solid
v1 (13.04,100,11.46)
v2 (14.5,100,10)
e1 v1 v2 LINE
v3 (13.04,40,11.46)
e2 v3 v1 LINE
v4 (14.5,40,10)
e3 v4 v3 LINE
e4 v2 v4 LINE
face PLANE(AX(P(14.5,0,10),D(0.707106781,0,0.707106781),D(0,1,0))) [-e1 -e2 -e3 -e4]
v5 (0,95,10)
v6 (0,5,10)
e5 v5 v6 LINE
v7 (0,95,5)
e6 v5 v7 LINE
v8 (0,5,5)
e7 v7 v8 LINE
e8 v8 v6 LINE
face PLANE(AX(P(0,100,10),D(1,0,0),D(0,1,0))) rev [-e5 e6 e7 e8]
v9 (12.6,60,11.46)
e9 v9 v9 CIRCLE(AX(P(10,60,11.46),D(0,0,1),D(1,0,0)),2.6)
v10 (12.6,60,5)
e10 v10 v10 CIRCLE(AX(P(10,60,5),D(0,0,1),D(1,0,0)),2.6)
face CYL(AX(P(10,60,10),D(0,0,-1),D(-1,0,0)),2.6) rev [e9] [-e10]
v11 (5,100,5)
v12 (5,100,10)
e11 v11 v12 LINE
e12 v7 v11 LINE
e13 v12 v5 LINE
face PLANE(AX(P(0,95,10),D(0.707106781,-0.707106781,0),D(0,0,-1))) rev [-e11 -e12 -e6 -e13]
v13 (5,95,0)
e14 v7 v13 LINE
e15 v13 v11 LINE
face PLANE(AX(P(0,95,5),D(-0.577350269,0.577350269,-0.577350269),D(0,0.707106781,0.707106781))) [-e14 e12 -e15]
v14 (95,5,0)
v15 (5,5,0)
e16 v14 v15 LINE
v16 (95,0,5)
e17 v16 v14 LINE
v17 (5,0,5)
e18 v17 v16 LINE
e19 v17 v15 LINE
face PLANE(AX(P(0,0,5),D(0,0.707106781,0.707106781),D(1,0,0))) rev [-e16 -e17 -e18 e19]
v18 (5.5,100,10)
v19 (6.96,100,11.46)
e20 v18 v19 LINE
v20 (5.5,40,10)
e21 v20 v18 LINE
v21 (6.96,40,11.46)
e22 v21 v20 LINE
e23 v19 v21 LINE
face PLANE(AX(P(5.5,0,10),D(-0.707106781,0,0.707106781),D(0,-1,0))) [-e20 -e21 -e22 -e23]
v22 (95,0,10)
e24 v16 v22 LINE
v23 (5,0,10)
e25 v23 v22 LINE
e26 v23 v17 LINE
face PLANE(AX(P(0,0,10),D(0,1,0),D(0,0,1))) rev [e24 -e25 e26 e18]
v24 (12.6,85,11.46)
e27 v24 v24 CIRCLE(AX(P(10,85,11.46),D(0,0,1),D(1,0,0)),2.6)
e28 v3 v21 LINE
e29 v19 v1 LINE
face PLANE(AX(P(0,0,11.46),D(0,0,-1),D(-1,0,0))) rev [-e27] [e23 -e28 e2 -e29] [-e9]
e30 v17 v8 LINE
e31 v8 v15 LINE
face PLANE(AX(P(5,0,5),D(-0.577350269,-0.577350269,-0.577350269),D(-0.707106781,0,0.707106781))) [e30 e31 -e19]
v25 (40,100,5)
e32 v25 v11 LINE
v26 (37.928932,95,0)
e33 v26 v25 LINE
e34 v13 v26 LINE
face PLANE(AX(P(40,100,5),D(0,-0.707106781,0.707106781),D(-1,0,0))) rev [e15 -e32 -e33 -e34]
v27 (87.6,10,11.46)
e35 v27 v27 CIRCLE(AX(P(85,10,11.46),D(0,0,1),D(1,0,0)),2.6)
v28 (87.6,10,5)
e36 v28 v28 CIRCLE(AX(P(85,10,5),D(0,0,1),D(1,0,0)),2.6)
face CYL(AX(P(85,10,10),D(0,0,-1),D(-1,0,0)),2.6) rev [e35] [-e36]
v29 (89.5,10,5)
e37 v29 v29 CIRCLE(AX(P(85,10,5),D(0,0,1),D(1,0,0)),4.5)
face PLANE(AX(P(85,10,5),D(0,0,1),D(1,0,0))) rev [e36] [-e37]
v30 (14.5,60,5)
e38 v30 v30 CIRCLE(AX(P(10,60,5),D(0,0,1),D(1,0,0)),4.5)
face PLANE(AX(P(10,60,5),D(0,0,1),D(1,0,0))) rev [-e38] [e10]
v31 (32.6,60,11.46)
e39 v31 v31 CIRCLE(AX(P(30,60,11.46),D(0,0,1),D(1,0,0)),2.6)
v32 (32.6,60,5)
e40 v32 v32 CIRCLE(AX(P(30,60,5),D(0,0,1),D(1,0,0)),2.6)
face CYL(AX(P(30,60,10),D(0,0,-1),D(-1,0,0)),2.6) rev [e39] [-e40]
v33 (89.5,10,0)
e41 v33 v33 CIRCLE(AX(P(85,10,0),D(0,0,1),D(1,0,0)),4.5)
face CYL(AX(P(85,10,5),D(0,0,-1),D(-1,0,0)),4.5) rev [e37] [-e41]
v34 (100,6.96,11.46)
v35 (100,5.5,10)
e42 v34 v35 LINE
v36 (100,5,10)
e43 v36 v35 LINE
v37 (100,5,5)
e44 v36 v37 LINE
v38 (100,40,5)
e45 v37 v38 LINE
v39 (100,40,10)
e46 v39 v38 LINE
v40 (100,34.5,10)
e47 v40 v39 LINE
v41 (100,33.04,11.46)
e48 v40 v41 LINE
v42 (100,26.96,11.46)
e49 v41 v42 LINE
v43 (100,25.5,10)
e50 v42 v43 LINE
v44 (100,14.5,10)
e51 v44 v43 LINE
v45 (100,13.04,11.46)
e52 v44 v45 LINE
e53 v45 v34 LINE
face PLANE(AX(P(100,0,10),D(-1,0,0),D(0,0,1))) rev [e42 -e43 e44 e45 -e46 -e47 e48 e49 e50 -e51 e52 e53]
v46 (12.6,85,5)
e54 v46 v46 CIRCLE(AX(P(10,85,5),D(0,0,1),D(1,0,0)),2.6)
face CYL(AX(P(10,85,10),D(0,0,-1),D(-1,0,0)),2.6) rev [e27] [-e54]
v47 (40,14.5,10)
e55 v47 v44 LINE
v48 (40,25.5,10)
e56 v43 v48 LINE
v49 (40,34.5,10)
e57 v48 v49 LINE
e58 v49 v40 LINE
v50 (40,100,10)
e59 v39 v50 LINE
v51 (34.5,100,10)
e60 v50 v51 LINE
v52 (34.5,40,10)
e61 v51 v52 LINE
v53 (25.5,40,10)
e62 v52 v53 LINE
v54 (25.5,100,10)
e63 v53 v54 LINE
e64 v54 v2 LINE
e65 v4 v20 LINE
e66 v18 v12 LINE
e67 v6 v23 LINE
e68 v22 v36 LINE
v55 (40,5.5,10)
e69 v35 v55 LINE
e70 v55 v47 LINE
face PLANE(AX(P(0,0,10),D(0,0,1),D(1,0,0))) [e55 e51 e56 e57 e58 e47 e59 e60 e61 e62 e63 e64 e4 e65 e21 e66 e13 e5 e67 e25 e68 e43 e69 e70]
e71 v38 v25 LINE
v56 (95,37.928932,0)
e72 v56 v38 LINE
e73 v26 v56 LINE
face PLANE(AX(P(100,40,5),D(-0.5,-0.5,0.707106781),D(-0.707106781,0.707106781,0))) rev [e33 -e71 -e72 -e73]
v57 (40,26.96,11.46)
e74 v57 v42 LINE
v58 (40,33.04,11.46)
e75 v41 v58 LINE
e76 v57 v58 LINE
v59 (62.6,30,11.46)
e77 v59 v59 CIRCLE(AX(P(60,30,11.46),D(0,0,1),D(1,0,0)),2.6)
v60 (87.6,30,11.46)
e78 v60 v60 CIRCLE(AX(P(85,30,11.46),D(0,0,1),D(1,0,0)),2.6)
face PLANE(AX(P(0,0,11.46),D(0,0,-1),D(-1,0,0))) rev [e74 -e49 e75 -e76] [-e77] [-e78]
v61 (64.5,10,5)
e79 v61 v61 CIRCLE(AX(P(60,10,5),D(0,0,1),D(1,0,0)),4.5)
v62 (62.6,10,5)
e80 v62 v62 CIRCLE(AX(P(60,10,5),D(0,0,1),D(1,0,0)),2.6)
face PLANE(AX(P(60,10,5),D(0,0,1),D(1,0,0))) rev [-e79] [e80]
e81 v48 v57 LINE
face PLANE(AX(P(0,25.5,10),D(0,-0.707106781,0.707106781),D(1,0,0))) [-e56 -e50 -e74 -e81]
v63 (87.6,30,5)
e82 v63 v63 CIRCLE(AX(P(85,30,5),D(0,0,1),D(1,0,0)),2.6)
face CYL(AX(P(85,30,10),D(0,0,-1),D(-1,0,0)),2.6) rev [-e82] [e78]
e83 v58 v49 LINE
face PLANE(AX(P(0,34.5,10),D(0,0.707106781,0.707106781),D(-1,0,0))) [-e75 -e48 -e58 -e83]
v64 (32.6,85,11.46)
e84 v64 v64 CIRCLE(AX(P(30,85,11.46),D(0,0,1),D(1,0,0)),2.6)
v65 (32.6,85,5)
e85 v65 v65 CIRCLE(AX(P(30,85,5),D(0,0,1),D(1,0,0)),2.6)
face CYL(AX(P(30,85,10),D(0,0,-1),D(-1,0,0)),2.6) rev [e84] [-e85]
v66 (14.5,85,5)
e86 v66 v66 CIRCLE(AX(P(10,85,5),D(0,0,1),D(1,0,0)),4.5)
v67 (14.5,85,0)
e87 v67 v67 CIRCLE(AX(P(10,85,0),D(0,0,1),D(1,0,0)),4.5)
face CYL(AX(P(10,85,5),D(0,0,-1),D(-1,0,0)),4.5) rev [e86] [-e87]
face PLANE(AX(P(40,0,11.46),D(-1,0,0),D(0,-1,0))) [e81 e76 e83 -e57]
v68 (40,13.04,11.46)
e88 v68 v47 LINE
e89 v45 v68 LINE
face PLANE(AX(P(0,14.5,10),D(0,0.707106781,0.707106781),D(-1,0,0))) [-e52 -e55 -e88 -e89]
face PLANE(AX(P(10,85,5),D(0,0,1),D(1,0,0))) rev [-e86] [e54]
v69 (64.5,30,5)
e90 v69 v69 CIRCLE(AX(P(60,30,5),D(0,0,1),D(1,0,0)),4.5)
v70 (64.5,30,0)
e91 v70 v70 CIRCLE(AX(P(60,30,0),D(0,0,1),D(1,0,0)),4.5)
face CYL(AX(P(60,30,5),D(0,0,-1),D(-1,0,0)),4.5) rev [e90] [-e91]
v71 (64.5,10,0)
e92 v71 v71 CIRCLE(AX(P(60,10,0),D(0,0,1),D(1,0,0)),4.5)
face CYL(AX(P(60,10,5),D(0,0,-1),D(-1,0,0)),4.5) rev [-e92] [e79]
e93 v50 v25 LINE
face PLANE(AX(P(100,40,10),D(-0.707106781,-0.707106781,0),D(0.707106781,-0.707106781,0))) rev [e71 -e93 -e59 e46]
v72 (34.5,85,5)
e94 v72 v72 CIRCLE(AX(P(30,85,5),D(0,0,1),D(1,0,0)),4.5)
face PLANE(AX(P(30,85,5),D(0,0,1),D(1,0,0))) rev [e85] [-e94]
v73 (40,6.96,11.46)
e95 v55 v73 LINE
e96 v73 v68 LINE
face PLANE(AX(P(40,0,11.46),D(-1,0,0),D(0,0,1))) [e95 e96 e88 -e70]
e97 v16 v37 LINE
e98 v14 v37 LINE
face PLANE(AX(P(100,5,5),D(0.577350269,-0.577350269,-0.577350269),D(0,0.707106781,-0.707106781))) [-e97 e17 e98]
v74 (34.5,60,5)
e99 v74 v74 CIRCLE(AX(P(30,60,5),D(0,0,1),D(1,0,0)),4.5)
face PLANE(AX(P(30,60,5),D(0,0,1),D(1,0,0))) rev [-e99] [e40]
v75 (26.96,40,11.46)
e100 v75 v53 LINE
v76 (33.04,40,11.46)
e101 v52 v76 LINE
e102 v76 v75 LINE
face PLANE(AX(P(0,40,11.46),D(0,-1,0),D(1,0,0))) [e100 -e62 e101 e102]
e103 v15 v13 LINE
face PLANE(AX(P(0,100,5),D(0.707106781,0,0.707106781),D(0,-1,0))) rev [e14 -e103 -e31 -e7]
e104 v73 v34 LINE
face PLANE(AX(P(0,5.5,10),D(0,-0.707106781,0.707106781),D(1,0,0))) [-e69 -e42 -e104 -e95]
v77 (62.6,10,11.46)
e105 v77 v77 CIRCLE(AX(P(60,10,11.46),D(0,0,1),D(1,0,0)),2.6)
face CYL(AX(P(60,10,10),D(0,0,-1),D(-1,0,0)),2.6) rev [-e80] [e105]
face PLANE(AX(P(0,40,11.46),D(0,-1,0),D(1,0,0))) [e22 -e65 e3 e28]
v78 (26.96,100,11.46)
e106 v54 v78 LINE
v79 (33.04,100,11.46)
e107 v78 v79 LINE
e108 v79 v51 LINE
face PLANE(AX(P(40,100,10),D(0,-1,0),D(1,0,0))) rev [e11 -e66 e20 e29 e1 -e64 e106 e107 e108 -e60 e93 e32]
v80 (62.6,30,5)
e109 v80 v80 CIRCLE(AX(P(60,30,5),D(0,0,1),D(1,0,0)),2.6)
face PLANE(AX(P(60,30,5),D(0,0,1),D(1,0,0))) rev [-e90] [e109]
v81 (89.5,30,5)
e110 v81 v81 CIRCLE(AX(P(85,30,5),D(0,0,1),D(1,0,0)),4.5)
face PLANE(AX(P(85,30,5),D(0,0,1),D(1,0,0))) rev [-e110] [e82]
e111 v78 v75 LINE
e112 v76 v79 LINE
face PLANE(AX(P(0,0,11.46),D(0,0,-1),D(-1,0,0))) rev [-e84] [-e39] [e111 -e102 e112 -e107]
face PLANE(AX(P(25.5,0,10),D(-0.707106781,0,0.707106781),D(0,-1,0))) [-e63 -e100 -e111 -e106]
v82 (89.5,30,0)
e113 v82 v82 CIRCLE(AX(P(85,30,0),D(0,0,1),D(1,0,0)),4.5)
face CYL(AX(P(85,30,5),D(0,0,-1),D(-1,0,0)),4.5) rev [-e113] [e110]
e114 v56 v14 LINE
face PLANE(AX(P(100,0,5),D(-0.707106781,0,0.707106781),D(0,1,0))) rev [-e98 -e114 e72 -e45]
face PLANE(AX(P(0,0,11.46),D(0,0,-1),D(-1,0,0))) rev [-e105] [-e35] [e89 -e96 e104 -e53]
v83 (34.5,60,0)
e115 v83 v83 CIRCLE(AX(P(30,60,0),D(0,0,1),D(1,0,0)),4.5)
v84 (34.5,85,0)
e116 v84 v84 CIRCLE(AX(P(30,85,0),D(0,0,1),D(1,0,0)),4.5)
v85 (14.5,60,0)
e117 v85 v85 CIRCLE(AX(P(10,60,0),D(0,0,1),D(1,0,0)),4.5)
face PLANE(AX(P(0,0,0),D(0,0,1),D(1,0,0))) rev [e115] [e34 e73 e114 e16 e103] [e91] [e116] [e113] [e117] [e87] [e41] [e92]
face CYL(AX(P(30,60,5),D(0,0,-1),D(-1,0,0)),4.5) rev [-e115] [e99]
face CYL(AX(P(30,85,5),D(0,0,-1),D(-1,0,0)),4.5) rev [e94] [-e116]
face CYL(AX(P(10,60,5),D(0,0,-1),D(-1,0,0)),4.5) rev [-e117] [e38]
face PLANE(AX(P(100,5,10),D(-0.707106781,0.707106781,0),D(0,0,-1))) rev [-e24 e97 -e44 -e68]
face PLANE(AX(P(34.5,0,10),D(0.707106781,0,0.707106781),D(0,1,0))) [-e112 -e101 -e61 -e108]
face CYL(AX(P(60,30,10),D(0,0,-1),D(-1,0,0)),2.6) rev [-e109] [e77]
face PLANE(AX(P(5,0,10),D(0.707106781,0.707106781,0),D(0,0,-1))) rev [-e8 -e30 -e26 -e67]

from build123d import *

# Parameters (mm, degrees)
BOSS_EXTRUDE1_DEPTH     = 10
SKETCH2_R               = 2.6
CUT_EXTRUDE1_DEPTH      = 142.774468788
BOSS_EXTRUDE3_START     = 10
SKETCH3_W               = 60
SKETCH3_H               = 9
SKETCH3_W_2             = 9
SKETCH3_H_2             = 60
BOSS_EXTRUDE3_DEPTH     = 1.46
CUT_EXTRUDE2_DEPTH      = 142.884923794
CUT_EXTRUDE2_DEPTH_BACK = 142.884923794
SKETCH2_2_R             = 2.6
CHAMFER1_SIZE           = 1.46
SKETCH4_R               = 4.5
CUT_EXTRUDE3_DEPTH      = 5
CHAMFER2_SIZE           = 5


with BuildPart() as part:
    # Sketch1 → Boss-Extrude1 (new body)
    with BuildSketch(Plane.XY):
        Polygon((0, 0), (100, 0), (100, 40), (40, 100), (0, 100), align=None)
    extrude(amount=BOSS_EXTRUDE1_DEPTH)

    # Sketch2 → Cut-Extrude1 (cut, through all)
    with BuildSketch(Plane.XY):
        with Locations((10, 85)):
            Circle(SKETCH2_R)
        with Locations((30, 85)):
            Circle(SKETCH2_R)
        with Locations((10, 60)):
            Circle(SKETCH2_R)
        with Locations((30, 60)):
            Circle(SKETCH2_R)
        with Locations((85, 30)):
            Circle(SKETCH2_R)
        with Locations((85, 10)):
            Circle(SKETCH2_R)
        with Locations((60, 10)):
            Circle(SKETCH2_R)
        with Locations((60, 30)):
            Circle(SKETCH2_R)
    extrude(amount=CUT_EXTRUDE1_DEPTH, mode=Mode.SUBTRACT)

    # Sketch3 → Boss-Extrude3 (add)
    with BuildSketch(Plane.XY.offset(BOSS_EXTRUDE3_START)):
        with Locations((70, 30)):
            Rectangle(SKETCH3_W, SKETCH3_H)
        with Locations((70, 10)):
            Rectangle(SKETCH3_W, SKETCH3_H)
        with Locations((10, 70)):
            Rectangle(SKETCH3_W_2, SKETCH3_H_2)
        with Locations((30, 70)):
            Rectangle(SKETCH3_W_2, SKETCH3_H_2)
    extrude(amount=BOSS_EXTRUDE3_DEPTH)

    # Sketch2<2> → Cut-Extrude2 (cut, two sides: drawn at the far end of the back side and taken through both)
    with BuildSketch(Plane.XY.offset(-CUT_EXTRUDE2_DEPTH_BACK)):
        with Locations((10, 85)):
            Circle(SKETCH2_2_R)
        with Locations((30, 85)):
            Circle(SKETCH2_2_R)
        with Locations((10, 60)):
            Circle(SKETCH2_2_R)
        with Locations((30, 60)):
            Circle(SKETCH2_2_R)
        with Locations((85, 30)):
            Circle(SKETCH2_2_R)
        with Locations((85, 10)):
            Circle(SKETCH2_2_R)
        with Locations((60, 10)):
            Circle(SKETCH2_2_R)
        with Locations((60, 30)):
            Circle(SKETCH2_2_R)
    extrude(amount=CUT_EXTRUDE2_DEPTH + CUT_EXTRUDE2_DEPTH_BACK, mode=Mode.SUBTRACT)

    # Chamfer1
    chamfer1_edges = [part.edges().sort_by_distance(p)[0] for p in [
        (14.5, 70, 11.46),
        (5.5, 70, 11.46),
        (25.5, 70, 11.46),
        (34.5, 70, 11.46),
        (70, 5.5, 11.46),
        (70, 14.5, 11.46),
        (70, 25.5, 11.46),
        (70, 34.5, 11.46),
    ]]
    chamfer(chamfer1_edges, length=CHAMFER1_SIZE - 0.0001)  # a hair under: the kernel refuses the full size

    # Sketch4 → Cut-Extrude3 (cut)
    with BuildSketch(Plane.XY):
        with Locations((10, 85)):
            Circle(SKETCH4_R)
        with Locations((30, 85)):
            Circle(SKETCH4_R)
        with Locations((30, 60)):
            Circle(SKETCH4_R)
        with Locations((10, 60)):
            Circle(SKETCH4_R)
        with Locations((60, 30)):
            Circle(SKETCH4_R)
        with Locations((85, 30)):
            Circle(SKETCH4_R)
        with Locations((85, 10)):
            Circle(SKETCH4_R)
        with Locations((60, 10)):
            Circle(SKETCH4_R)
    extrude(amount=CUT_EXTRUDE3_DEPTH, mode=Mode.SUBTRACT)

    # Chamfer2
    chamfer2_edges = [part.edges().sort_by_distance(p)[0] for p in [
        (20, 100, 0),
        (70, 70, 0),
        (100, 20, 0),
        (50, 0, 0),
        (0, 50, 0),
        (0, 100, 5),
        (100, 0, 5),
        (0, 0, 5),
    ]]
    chamfer(chamfer2_edges, length=CHAMFER2_SIZE)


solid = part.part
